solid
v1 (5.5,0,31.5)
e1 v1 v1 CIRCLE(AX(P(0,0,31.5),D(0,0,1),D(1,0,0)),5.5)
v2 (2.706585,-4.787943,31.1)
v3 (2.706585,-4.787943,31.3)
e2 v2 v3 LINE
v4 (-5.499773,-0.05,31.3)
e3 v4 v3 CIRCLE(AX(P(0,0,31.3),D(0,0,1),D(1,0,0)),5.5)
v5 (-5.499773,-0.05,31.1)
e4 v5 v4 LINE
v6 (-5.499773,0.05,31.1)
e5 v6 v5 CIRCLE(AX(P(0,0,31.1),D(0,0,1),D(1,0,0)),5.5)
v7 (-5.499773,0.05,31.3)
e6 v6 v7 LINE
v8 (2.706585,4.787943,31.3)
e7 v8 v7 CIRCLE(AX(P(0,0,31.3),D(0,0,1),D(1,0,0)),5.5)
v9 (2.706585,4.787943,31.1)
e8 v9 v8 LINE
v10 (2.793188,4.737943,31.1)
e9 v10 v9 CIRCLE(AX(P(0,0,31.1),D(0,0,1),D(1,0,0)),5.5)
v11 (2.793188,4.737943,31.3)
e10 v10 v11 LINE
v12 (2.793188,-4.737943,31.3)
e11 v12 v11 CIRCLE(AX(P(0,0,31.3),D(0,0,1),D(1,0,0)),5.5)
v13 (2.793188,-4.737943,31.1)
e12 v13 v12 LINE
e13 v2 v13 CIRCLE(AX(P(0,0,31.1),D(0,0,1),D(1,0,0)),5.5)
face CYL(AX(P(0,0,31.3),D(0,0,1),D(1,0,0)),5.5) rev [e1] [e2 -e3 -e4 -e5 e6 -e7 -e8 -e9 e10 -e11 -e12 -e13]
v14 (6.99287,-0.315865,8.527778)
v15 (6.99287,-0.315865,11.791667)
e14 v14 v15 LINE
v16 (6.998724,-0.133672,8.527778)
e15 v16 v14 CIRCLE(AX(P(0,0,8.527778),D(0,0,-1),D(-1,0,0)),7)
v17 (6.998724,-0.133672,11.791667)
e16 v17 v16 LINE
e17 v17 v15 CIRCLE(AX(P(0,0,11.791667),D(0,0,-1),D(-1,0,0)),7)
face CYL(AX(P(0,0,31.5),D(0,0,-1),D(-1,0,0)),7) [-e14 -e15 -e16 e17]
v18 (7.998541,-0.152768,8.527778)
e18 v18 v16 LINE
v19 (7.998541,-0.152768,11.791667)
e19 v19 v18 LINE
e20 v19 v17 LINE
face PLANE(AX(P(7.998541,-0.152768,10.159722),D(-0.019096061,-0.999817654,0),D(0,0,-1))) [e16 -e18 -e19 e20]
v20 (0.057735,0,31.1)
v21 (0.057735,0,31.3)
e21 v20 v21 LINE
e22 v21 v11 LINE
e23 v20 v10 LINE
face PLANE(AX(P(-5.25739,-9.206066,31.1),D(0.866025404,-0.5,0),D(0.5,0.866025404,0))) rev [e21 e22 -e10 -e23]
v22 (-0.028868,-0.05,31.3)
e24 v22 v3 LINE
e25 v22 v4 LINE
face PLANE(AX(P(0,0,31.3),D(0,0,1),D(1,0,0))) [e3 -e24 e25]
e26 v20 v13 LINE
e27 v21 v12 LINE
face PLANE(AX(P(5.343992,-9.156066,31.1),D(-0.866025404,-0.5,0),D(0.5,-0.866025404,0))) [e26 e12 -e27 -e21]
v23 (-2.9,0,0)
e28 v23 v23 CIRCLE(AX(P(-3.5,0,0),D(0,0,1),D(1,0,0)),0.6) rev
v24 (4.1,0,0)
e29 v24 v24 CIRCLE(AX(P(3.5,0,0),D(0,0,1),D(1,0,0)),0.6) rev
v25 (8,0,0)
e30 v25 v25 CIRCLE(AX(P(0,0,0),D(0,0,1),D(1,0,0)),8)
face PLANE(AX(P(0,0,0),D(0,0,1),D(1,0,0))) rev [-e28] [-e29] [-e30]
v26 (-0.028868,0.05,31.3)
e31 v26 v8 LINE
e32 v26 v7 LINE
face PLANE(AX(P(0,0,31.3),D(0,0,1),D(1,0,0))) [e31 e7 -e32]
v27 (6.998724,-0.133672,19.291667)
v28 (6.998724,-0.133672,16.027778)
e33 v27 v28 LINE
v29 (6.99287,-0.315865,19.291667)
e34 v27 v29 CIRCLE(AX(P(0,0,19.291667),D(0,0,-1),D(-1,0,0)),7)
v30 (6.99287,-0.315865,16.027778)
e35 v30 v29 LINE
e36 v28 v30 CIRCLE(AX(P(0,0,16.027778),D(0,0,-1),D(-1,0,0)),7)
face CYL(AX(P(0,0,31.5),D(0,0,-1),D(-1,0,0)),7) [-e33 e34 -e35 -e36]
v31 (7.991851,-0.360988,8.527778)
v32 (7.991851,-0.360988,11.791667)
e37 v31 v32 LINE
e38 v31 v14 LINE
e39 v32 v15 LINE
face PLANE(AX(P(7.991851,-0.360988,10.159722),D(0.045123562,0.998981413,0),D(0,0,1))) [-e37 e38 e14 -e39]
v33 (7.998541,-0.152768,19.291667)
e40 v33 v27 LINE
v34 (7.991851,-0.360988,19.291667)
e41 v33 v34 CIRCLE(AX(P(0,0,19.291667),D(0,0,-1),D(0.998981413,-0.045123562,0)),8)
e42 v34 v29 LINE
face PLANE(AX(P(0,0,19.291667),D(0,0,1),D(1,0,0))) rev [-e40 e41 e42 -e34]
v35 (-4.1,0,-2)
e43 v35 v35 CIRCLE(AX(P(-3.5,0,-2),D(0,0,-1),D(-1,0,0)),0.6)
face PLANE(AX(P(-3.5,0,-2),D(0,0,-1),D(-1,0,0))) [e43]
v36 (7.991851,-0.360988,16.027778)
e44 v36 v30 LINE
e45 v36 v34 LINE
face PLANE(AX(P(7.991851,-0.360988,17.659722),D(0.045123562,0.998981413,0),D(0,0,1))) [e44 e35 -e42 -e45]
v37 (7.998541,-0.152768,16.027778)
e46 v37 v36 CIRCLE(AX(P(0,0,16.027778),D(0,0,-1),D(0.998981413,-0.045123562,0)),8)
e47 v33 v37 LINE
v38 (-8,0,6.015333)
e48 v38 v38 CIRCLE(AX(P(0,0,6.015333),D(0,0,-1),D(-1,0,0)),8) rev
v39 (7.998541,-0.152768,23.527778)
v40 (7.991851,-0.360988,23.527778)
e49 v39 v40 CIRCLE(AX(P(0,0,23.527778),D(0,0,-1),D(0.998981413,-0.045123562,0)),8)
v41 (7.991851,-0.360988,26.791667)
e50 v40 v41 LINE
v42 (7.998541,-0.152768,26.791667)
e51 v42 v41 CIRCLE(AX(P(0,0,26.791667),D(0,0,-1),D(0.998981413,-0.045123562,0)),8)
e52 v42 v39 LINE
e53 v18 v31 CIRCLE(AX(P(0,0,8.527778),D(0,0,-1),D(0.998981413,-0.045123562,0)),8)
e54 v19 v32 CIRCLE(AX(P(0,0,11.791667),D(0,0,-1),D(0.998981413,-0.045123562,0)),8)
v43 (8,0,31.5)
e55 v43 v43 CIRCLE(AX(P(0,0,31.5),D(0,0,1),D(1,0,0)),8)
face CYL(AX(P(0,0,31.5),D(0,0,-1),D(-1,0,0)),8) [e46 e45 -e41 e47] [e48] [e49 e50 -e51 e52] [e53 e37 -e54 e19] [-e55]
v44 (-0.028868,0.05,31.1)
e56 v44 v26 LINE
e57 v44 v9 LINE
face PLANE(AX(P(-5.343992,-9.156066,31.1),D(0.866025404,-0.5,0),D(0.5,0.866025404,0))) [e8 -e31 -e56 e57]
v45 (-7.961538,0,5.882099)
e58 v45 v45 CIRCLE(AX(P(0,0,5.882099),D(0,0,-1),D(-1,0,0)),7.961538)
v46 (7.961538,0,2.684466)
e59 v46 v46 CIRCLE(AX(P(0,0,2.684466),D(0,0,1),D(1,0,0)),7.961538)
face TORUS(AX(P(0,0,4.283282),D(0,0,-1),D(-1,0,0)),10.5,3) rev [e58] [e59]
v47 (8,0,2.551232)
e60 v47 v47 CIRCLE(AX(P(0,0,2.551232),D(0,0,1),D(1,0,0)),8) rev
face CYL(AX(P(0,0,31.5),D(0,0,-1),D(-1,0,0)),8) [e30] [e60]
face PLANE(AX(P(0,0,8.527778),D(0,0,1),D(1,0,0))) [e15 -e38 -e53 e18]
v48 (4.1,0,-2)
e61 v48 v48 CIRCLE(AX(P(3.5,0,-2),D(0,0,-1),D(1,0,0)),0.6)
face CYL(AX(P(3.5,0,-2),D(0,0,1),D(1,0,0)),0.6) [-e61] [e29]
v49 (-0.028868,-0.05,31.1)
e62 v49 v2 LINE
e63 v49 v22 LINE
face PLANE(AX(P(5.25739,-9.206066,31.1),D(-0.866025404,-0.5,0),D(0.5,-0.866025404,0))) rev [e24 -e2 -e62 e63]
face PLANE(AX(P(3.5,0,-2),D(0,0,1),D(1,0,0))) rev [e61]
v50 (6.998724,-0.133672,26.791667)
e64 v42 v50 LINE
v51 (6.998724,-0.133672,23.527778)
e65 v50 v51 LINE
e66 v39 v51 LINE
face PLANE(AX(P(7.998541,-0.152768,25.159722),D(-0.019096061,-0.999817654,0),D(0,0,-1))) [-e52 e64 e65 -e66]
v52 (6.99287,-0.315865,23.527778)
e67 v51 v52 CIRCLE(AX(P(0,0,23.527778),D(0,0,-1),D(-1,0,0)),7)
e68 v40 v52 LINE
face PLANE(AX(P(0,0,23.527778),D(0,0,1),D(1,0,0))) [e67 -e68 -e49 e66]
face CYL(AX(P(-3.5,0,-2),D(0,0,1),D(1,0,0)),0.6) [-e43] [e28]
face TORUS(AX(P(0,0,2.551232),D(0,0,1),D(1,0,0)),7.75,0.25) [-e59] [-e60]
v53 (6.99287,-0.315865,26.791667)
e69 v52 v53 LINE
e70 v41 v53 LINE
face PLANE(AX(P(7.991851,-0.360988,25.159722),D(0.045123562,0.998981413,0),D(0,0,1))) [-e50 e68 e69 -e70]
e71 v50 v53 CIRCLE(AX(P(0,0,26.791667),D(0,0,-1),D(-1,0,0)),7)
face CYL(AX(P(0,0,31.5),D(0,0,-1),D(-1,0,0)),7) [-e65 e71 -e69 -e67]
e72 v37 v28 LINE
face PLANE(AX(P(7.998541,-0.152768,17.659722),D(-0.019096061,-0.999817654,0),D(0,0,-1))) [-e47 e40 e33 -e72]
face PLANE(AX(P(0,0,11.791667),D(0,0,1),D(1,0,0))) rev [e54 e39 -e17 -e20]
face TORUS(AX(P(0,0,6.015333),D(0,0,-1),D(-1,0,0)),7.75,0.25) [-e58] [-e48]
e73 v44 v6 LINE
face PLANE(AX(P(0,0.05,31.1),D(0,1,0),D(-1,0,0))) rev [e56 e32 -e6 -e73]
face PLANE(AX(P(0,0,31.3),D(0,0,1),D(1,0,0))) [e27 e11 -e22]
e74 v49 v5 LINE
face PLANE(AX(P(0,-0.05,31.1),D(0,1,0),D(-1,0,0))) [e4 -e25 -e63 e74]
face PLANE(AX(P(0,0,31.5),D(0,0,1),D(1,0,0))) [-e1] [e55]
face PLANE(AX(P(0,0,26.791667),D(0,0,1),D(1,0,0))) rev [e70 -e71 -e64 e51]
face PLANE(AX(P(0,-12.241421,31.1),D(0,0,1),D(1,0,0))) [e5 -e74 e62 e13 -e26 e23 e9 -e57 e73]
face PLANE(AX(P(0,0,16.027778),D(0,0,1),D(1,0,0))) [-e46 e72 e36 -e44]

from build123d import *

# Parameters (mm, degrees)
SKETCH_1_R          = 8
EXTRUDE_1_DEPTH     = 31.5
SKETCH_2_R          = 5.5
CUT_EXTRUDE_1_DEPTH = 0.2
CUT_EXTRUDE_2_DEPTH = 0.2
FILLET_1_R          = 0.25
SKETCH_5_R          = 0.6
EXTRUDE_2_DEPTH     = 2
WRAP_START          = 8.527777778
WRAP_2_DEPTH        = 3.263888889
WRAP_START_2        = 16.027777778
WRAP_2_2_DEPTH      = 3.263888889
WRAP_START_3        = 23.527777778
WRAP_2_3_DEPTH      = 3.263888889


# Read off the part's stored shape, not the designer's step: 包覆2
with BuildPart() as part:
    # 草图1 → 凸台-拉伸1 (new body)
    with BuildSketch(Plane.XY):
        Circle(SKETCH_1_R)
    extrude(amount=EXTRUDE_1_DEPTH)

    # 草图2 → 切除-拉伸1 (cut)
    with BuildSketch(Plane.XY.offset(31.5)):
        Circle(SKETCH_2_R)
    extrude(amount=-CUT_EXTRUDE_1_DEPTH, mode=Mode.SUBTRACT)

    # 草图3 → 切除-拉伸2 (cut)
    with BuildSketch(Plane.XY.offset(31.3)):
        with BuildLine():
            Line((-0.04330127, 0.025), (-0.028867513, 0.05))
            Line((-0.028867513, 0.05), (-5.499772723, 0.05))
            ThreePointArc((-5.499772723, 0.05), (-5.5, 0), (-5.499772723, -0.05))
            Line((-5.499772723, -0.05), (-0.028867513, -0.05))
            Line((-0.028867513, -0.05), (-0.04330127, -0.025))
            Line((-0.04330127, -0.025), (0, 0))
            Line((0, 0), (-0.04330127, 0.025))
        make_face()
        with BuildLine():
            Line((0.04330127, -0.025), (0, 0))
            Line((0, 0), (0, -0.05))
            Line((0, -0.05), (-0.028867513, -0.05))
            Line((-0.028867513, -0.05), (2.706585091, -4.787942893))
            ThreePointArc((2.706585091, -4.787942893), (2.75, -4.763139721), (2.793187631, -4.737942893))
            Line((2.793187631, -4.737942893), (0.057735027, 0))
            Line((0.057735027, 0), (0.04330127, -0.025))
        make_face()
        with BuildLine():
            Line((-0.028867513, 0.05), (0, 0.05))
            Line((0, 0.05), (0, 0))
            Line((0, 0), (0.04330127, 0.025))
            Line((0.04330127, 0.025), (0.057735027, 0))
            Line((0.057735027, 0), (2.793187631, 4.737942893))
            ThreePointArc((2.793187631, 4.737942893), (2.75, 4.763139721), (2.706585091, 4.787942893))
            Line((2.706585091, 4.787942893), (-0.028867513, 0.05))
        make_face()
        Polygon((0, 0), (0, 0.05), (-0.028867513, 0.05), (-0.04330127, 0.025), align=None)
        Polygon((0, -0.05), (0, 0), (-0.04330127, -0.025), (-0.028867513, -0.05), align=None)
        Polygon((0.04330127, 0.025), (0, 0), (0.04330127, -0.025), (0.057735027, 0), align=None)
    extrude(amount=-CUT_EXTRUDE_2_DEPTH, mode=Mode.SUBTRACT)

    # 草图4 → 切除-旋转1 (revolve, cut)
    with BuildSketch(Plane(origin=(0, 0, 0), x_dir=(1, 0, 0), z_dir=(0, 1, 0))):
        with BuildLine():
            Line((-8.318421305, -2.223982894), (-8.318421305, -6.342581877))
            ThreePointArc((-8.318421305, -6.342581877), (-7.5, -4.283282386), (-8.318421305, -2.223982894))
        make_face()
    revolve(axis=Axis((0, 0, 0), (0, 0, 1)), mode=Mode.SUBTRACT)

    # 圆角1
    fillet_1_edges = [part.edges().sort_by_distance(p)[0] for p in [
        (0, 8, 5.941594781),
        (0, -8, 2.62496999),
    ]]
    fillet(fillet_1_edges, radius=FILLET_1_R)

    # 草图5 → 凸台-拉伸2 (add)
    with BuildSketch(Plane(origin=(0, 0, 0), x_dir=(-1, 0, 0), z_dir=(0, 0, -1))):
        with Locations(Location((3.5, 0, 0), (0, 0, 180))):
            Circle(SKETCH_5_R)
        with Locations(Location((-3.5, 0, 0), (0, 0, 180))):
            Circle(SKETCH_5_R)
    extrude(amount=EXTRUDE_2_DEPTH)

    # 包覆2 outline → 包覆2 (cut)
    with BuildSketch(Plane.XY.offset(WRAP_START)):
        with BuildLine():
            Line((7.998541229, -0.152768492), (6.998723575, -0.13367243))
            ThreePointArc((6.998723575, -0.13367243), (6.996389817, -0.224787737), (6.992869893, -0.315864933))
            Line((6.992869893, -0.315864933), (7.991851307, -0.360988495))
            ThreePointArc((7.991851307, -0.360988495), (7.995874077, -0.256900271), (7.998541229, -0.152768492))
        make_face()
    extrude(amount=WRAP_2_DEPTH, mode=Mode.SUBTRACT)

    # Wrap 2 2 outline → Wrap 2 2 (cut)
    with BuildSketch(Plane.XY.offset(WRAP_START_2)):
        with BuildLine():
            Line((7.998541229, -0.152768492), (6.998723575, -0.13367243))
            ThreePointArc((6.998723575, -0.13367243), (6.996389817, -0.224787737), (6.992869893, -0.315864933))
            Line((6.992869893, -0.315864933), (7.991851307, -0.360988495))
            ThreePointArc((7.991851307, -0.360988495), (7.995874077, -0.256900271), (7.998541229, -0.152768492))
        make_face()
    extrude(amount=WRAP_2_2_DEPTH, mode=Mode.SUBTRACT)

    # Wrap 2 3 outline → Wrap 2 3 (cut)
    with BuildSketch(Plane.XY.offset(WRAP_START_3)):
        with BuildLine():
            Line((7.998541229, -0.152768492), (6.998723575, -0.13367243))
            ThreePointArc((6.998723575, -0.13367243), (6.996389817, -0.224787737), (6.992869893, -0.315864933))
            Line((6.992869893, -0.315864933), (7.991851307, -0.360988495))
            ThreePointArc((7.991851307, -0.360988495), (7.995874077, -0.256900271), (7.998541229, -0.152768492))
        make_face()
    extrude(amount=WRAP_2_3_DEPTH, mode=Mode.SUBTRACT)


solid = part.part
